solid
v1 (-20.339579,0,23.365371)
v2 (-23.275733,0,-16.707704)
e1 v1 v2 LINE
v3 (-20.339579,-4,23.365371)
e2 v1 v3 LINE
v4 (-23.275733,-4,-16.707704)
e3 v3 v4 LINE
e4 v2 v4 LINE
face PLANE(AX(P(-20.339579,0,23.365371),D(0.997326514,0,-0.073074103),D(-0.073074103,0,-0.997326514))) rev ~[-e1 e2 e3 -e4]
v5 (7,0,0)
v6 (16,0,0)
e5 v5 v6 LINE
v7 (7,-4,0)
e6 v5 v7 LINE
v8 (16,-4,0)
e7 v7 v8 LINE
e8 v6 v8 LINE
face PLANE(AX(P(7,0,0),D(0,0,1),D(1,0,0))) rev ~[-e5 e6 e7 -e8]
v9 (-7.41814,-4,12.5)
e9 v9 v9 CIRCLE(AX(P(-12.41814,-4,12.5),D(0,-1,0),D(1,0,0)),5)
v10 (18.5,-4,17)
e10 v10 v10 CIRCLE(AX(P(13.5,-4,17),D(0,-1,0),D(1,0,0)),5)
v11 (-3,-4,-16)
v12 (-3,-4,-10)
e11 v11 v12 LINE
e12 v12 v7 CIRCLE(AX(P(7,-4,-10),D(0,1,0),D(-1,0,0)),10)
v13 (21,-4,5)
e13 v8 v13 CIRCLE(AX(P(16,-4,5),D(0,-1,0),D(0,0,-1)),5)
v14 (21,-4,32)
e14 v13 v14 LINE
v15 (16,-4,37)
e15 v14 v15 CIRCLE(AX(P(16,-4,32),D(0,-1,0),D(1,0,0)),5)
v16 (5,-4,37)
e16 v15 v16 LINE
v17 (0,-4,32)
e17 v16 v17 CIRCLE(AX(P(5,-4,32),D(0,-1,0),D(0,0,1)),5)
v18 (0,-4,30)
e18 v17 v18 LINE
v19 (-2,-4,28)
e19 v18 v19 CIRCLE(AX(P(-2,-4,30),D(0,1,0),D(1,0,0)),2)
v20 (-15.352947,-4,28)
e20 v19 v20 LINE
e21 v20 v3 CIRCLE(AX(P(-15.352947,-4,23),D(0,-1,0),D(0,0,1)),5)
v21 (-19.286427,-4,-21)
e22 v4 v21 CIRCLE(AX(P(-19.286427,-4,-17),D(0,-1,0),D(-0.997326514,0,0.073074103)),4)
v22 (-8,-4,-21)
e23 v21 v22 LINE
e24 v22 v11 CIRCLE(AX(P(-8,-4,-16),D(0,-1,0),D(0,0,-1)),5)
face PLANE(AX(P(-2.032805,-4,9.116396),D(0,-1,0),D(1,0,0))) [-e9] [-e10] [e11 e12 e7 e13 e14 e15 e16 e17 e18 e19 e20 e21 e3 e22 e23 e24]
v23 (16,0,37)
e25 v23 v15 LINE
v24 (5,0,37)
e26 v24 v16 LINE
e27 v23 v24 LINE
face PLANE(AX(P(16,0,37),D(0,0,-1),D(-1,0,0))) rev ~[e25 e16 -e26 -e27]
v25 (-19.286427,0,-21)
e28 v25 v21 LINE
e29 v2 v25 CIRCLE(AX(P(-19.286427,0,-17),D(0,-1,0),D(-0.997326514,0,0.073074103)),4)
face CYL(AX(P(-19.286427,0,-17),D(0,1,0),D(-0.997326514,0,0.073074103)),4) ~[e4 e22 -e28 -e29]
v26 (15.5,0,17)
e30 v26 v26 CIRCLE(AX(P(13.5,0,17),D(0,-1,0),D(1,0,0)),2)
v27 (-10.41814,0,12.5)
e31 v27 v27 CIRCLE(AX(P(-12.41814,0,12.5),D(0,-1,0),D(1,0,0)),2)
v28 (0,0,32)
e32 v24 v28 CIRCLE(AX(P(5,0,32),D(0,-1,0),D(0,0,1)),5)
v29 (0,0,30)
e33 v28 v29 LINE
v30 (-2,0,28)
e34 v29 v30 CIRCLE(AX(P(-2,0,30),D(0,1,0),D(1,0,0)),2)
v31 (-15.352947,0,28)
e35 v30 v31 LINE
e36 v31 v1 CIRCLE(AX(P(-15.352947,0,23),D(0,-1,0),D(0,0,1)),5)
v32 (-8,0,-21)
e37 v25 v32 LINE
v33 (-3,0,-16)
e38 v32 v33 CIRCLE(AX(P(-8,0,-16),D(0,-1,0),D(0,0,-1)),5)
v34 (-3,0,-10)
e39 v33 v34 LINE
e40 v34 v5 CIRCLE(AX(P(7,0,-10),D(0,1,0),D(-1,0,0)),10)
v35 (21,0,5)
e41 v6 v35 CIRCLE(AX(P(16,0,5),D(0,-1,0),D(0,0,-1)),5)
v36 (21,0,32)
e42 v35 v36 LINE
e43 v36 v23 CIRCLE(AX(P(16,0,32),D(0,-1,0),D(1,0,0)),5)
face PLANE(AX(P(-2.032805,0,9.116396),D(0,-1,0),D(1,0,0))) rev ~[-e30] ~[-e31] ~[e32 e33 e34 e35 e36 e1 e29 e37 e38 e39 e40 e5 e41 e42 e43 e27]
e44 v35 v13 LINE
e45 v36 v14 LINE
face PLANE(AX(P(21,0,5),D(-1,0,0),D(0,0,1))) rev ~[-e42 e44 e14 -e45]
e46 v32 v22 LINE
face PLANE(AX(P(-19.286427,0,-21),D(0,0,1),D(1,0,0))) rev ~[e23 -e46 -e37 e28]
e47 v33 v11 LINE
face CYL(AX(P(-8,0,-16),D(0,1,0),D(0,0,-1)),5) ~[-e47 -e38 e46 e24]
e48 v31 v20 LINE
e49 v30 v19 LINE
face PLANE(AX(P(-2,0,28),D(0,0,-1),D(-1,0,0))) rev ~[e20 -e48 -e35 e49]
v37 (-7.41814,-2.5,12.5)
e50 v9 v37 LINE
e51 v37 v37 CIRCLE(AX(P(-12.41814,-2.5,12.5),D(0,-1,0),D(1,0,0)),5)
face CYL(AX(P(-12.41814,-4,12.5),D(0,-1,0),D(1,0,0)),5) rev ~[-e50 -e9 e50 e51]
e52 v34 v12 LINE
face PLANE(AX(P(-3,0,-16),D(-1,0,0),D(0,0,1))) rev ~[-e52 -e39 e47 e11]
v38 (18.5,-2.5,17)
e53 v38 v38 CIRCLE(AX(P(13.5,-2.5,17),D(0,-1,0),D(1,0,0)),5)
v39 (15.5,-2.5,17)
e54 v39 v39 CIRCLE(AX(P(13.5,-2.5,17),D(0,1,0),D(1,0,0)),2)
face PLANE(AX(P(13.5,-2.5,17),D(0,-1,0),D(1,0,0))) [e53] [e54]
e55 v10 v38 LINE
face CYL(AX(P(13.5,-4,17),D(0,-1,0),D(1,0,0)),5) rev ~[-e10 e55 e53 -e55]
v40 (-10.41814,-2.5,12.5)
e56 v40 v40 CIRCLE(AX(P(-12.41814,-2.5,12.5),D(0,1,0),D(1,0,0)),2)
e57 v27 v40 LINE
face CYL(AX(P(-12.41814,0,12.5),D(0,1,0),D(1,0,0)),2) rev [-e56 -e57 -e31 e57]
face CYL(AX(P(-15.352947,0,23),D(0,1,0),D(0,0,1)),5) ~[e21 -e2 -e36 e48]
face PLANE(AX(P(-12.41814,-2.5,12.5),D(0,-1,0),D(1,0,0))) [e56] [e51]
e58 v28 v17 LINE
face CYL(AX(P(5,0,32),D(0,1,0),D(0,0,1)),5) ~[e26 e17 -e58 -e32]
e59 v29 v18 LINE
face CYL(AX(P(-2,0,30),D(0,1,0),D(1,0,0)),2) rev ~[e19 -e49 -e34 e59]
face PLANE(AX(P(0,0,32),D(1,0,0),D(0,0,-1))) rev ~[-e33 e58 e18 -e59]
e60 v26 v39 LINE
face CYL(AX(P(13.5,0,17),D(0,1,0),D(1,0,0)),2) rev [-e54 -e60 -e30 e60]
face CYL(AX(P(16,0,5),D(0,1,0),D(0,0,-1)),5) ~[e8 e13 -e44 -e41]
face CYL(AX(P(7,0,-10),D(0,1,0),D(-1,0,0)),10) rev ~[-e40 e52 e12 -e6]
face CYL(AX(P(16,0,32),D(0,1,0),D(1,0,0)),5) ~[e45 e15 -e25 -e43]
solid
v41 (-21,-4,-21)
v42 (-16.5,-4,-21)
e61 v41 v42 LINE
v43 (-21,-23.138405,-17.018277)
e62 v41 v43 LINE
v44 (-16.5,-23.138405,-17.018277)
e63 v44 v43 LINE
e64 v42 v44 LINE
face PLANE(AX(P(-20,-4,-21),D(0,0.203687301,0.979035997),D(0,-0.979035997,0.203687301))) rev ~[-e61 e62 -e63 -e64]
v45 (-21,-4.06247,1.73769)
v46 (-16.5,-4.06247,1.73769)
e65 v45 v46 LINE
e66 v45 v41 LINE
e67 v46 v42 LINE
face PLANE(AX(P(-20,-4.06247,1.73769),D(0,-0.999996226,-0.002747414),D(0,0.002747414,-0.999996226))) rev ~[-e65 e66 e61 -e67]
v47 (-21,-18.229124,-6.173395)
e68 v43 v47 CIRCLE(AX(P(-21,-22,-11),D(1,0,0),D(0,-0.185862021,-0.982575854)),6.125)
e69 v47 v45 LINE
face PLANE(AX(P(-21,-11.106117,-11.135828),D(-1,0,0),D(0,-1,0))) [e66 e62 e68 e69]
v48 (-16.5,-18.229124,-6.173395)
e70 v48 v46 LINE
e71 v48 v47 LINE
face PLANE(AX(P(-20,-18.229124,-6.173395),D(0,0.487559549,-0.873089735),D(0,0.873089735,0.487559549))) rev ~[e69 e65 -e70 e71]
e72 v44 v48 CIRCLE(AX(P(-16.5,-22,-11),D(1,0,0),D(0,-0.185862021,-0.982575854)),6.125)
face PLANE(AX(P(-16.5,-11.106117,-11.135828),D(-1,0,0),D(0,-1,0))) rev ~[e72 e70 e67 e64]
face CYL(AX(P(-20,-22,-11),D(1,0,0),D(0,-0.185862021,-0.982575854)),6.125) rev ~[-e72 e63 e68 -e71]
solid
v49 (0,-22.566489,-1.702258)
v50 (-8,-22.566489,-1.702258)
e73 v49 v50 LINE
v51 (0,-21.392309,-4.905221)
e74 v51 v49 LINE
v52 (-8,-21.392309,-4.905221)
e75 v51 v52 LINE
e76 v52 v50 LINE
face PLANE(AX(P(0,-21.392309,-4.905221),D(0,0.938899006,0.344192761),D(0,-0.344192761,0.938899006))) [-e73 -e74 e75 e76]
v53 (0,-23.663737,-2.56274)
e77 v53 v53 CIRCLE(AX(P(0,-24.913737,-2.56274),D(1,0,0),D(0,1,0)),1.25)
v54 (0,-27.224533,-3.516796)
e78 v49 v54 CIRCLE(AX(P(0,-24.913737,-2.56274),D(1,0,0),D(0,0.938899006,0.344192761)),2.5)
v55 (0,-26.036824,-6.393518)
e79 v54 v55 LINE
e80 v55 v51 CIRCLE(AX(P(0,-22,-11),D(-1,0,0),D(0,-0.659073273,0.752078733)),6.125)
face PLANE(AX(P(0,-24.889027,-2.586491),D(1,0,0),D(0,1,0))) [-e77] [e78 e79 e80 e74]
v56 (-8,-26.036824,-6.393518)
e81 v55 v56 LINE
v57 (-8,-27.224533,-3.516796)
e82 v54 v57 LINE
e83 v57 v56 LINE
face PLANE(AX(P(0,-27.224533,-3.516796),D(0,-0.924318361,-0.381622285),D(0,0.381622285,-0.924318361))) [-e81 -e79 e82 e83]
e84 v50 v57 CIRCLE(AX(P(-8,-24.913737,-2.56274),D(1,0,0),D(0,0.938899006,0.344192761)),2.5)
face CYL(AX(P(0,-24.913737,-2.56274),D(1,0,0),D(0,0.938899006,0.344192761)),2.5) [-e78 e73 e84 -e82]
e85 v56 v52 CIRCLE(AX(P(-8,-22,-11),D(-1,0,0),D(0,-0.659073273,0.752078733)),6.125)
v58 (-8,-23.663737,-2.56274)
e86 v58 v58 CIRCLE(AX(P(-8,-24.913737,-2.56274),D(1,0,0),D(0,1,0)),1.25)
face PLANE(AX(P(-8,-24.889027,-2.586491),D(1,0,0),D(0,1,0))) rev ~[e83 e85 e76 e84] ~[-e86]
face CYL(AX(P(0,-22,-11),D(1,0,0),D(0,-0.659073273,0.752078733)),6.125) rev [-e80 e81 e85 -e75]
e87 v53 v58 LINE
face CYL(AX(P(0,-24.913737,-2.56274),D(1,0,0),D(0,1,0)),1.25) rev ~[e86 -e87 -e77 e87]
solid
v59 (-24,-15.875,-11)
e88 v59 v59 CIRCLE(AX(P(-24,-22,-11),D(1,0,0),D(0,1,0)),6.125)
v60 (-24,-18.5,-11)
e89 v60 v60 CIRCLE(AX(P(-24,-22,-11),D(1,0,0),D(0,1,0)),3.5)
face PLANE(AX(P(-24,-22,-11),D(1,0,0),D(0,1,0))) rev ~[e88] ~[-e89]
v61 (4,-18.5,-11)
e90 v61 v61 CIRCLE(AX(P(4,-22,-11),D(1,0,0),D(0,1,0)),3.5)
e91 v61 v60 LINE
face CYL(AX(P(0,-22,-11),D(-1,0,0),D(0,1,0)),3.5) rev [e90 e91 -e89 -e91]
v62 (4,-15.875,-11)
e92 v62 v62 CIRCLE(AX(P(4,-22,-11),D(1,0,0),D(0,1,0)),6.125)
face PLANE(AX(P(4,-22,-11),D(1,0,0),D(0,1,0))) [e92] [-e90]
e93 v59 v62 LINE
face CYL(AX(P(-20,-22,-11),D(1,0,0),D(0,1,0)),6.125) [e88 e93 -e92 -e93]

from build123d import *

# Parameters (mm, degrees)
F0_R           = 2
F1_DEPTH       = 4
F2_R           = 5
F3_DEPTH       = 1.5
F4_R           = 6.125
F4_R_2         = 3.5
F5_DEPTH       = 20
F6_R           = 1.25
F7_DEPTH       = 8
F8_DEPTH       = 4
F10_DEPTH      = 3.5
F10_DEPTH_BACK = 1
F11_DEPTH      = 4


with BuildPart() as f1:
    # F0 (on Front) → F1 (new body)
    with BuildSketch(Plane.XZ):
        with BuildLine():
            ThreePointArc((-3, -10), (-0.0710678119, -2.9289321881), (7, 0))
            Line((7, 0), (16, 0))
            ThreePointArc((16, 0), (19.5355339059, 1.4644660941), (21, 5))
            Line((21, 5), (21, 32))
            ThreePointArc((21, 32), (19.5355339059, 35.5355339059), (16, 37))
            Line((16, 37), (5, 37))
            ThreePointArc((5, 37), (1.4644660941, 35.5355339059), (0, 32))
            Line((0, 32), (0, 30))
            ThreePointArc((0, 30), (-0.5857864376, 28.5857864376), (-2, 28))
            Line((-2, 28), (-15.3529466806, 28))
            ThreePointArc((-15.3529466806, 28), (-18.7568523372, 26.6624344747), (-20.3395792507, 23.3653705126))
            Line((-20.3395792507, 23.3653705126), (-23.2757329417, -16.7077035899))
            ThreePointArc((-23.2757329417, -16.7077035899), (-22.2163744655, -19.7231245252), (-19.2864268857, -21))
            Line((-19.2864268857, -21), (-8, -21))
            ThreePointArc((-8, -21), (-4.4644660941, -19.5355339059), (-3, -16))
            Line((-3, -16), (-3, -10))
        make_face()
        with Locations((-12.4181403654, 12.5)):
            Circle(F0_R, mode=Mode.SUBTRACT)
        with Locations((13.5, 17)):
            Circle(F0_R, mode=Mode.SUBTRACT)
    extrude(amount=F1_DEPTH)

    # F2 (on face) → F3 (cut)
    with BuildSketch(Plane.XZ.offset(4)):
        with Locations((-12.4181403654, 12.5)):
            Circle(F2_R)
        with Locations((13.5, 17)):
            Circle(F2_R)
    extrude(amount=-F3_DEPTH, mode=Mode.SUBTRACT)


with BuildPart() as f5:
    # F4 (on Right) → F5 (new body)
    with BuildSketch(Plane.YZ):
        with Locations((-22, -11)):
            Circle(F4_R)
        with Locations((-22, -11)):
            Circle(F4_R_2, mode=Mode.SUBTRACT)
    extrude(amount=-F5_DEPTH)

    # F4 (on Right) → F8 (join)
    with BuildSketch(Plane.YZ):
        with Locations((-22, -11)):
            Circle(F4_R)
        with Locations((-22, -11)):
            Circle(F4_R_2, mode=Mode.SUBTRACT)
    extrude(amount=F8_DEPTH)

    # F11 (add): a face of the model
    f11_faces = [f5.faces().sort_by_distance(p)[0] for p in [
        (-20, -27.9517588386, -11),
    ]]
    extrude(f11_faces, amount=F11_DEPTH)


with BuildPart() as f7:
    # F6 (on face) → F7 (new body)
    with BuildSketch(Plane.YZ):
        with BuildLine():
            ThreePointArc((-27.2245328288, -3.5167956513), (-24.4274190035, -5.0149827659), (-22.4137369271, -2.56273994))
            ThreePointArc((-22.4137369271, -2.56273994), (-22.4522212571, -2.125772428), (-22.5664894122, -1.7022580377))
            ThreePointArc((-22.5664894122, -1.7022580377), (-25.8211887813, -0.2332483362), (-27.2245328288, -3.5167956513))
        make_face()
        with Locations((-24.9137369271, -2.56273994)):
            Circle(F6_R, mode=Mode.SUBTRACT)
        with BuildLine():
            ThreePointArc((-22.5664894122, -1.7022580377), (-22.4522212571, -2.125772428), (-22.4137369271, -2.56273994))
            ThreePointArc((-22.4137369271, -2.56273994), (-24.4274190035, -5.0149827659), (-27.2245328288, -3.5167956513))
            Line((-27.2245328288, -3.5167956513), (-26.0368237989, -6.3935177612))
            ThreePointArc((-26.0368237989, -6.3935177612), (-23.8690895414, -5.1671508432), (-21.3923093478, -4.9052205068))
            Line((-21.3923093478, -4.9052205068), (-22.5664894122, -1.7022580377))
        make_face()
    extrude(amount=-F7_DEPTH)


with BuildPart() as f10:
    # F9 (on face) → F10 (new body, two sides)
    with BuildSketch(Plane(origin=(-20, 0, 0), x_dir=(0, -1, 0), z_dir=(-1, 0, 0))) as f10_sk:
        with BuildLine():
            Line((4, -21), (23.1384048777, -17.0182771068))
            ThreePointArc((23.1384048777, -17.0182771068), (16.4200946717, -13.5259219163), (18.2291235039, -6.1733950388))
            Line((18.2291235039, -6.1733950388), (4.0624700915, 1.7376900148))
            Line((4.0624700915, 1.7376900148), (4, -21))
        make_face()
    extrude(amount=-F10_DEPTH)
    extrude(f10_sk.sketch, amount=F10_DEPTH_BACK)


with BuildPart() as f5_1:
    # F12: moved
    add(f5.part)


with BuildPart() as f7_1:
    # F12: moved
    add(f7.part)


with BuildPart() as f10_1:
    # F12: moved
    add(f10.part)


solid = Compound([f1.part, f5_1.part, f7_1.part, f10_1.part])
